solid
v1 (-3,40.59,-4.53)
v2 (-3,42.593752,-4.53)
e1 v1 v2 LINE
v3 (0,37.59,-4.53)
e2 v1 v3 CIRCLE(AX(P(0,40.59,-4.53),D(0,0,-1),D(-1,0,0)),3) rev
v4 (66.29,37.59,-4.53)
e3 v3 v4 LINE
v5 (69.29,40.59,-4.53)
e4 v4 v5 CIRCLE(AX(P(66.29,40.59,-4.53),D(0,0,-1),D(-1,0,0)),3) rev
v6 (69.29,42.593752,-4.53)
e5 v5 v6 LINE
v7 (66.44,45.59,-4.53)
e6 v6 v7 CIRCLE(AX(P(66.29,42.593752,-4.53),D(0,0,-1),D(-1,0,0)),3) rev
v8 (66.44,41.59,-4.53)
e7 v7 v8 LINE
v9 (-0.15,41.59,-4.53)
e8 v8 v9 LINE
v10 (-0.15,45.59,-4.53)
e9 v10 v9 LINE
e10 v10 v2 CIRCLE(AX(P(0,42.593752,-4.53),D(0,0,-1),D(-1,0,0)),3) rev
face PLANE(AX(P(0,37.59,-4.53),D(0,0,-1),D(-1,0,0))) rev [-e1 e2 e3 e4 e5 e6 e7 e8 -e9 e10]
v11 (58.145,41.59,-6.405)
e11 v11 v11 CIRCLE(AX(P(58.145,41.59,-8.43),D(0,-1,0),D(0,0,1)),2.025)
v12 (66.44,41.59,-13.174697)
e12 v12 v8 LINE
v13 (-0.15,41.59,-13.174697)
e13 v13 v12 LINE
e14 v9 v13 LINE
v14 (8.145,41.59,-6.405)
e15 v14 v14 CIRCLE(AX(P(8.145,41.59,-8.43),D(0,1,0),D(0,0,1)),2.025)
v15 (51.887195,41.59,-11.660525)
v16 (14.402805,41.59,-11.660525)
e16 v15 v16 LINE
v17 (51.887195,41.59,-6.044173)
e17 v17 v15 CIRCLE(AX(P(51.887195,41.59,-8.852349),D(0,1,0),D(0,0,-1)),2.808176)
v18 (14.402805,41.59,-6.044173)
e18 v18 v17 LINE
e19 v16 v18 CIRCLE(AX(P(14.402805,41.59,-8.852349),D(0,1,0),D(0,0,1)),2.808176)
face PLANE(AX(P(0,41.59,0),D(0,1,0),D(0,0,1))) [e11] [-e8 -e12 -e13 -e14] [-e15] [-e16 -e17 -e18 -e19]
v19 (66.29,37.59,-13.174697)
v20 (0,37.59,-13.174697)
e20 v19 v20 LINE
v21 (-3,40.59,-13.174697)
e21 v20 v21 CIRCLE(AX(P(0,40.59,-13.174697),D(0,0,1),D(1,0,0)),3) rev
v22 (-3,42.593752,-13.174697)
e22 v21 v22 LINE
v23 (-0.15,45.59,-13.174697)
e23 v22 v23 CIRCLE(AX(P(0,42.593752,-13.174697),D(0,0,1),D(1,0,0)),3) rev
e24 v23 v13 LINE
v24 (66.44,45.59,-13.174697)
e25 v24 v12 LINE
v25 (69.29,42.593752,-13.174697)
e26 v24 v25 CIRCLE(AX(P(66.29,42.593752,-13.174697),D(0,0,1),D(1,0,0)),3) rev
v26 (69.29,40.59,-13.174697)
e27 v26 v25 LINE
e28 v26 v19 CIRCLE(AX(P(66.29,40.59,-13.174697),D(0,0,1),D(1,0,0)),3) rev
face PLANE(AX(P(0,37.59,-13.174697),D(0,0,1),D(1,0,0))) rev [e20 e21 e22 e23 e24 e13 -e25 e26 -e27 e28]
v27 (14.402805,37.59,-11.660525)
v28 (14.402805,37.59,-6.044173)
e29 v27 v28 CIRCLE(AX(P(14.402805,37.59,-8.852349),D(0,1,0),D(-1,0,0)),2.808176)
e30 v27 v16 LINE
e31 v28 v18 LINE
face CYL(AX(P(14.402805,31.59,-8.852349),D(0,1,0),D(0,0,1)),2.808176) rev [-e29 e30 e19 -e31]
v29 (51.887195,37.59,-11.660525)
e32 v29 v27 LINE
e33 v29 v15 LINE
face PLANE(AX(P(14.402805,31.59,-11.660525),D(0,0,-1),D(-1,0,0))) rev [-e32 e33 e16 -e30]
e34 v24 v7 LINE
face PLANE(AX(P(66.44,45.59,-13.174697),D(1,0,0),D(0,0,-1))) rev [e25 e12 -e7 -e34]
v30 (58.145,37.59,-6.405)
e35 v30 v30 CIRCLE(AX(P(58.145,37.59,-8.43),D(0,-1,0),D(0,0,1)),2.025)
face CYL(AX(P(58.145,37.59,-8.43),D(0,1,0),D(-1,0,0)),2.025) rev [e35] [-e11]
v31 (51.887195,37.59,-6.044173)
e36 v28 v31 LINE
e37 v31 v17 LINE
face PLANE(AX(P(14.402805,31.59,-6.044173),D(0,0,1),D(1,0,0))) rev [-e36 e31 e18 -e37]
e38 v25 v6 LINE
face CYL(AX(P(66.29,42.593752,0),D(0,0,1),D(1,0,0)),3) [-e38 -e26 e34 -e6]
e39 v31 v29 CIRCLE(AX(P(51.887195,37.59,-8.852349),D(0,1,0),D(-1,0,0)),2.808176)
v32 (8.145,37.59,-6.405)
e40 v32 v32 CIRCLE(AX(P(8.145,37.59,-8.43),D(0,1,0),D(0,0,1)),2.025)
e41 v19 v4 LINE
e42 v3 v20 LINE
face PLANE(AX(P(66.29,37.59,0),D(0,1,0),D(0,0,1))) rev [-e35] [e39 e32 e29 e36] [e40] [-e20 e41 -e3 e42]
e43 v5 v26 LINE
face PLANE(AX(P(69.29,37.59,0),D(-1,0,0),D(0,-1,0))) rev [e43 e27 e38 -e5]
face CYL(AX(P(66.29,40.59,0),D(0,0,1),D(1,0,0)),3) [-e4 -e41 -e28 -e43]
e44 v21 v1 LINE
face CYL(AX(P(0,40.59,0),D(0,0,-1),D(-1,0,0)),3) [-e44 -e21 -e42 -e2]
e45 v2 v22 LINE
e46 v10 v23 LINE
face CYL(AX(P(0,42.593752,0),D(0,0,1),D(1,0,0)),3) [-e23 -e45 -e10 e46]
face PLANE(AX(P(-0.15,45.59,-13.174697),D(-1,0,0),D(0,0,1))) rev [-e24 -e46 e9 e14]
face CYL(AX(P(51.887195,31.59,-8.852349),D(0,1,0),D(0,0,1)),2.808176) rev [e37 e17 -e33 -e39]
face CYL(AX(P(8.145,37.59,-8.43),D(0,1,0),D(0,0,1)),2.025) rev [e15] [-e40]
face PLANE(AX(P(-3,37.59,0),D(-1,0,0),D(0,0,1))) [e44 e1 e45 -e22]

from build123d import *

# Parameters (mm, degrees)
SKETCH1_W                 = 66.29
SKETCH1_H                 = 100
BOSS_EXTRUDE1_DEPTH       = 41.59
SHELL2_T                  = -3
SHELL2_THICKNESS_2_FACE_W = 60.29
SHELL2_THICKNESS_2_FACE_H = 38.59
SHELL2_THICKNESS_2_DEPTH  = 1
SHELL2_THICKNESS_3_FACE_W = 60.29
SHELL2_THICKNESS_3_FACE_H = 38.59
SHELL2_THICKNESS_3_DEPTH  = 1
CUT_EXTRUDE1_DEPTH        = 125.59
FILLET1_R                 = 2
CUT_EXTRUDE2_REACH        = 128.981
SKETCH5_R                 = 5
SKETCH5_R_2               = 2.32
CUT_EXTRUDE3_START        = -3
SKETCH6_R                 = 23.17
CUT_EXTRUDE3_DEPTH        = 60.29
SKETCH7_R                 = 3.7
CUT_EXTRUDE4_DEPTH        = 1
BOSS_EXTRUDE2_DEPTH       = 10
SKETCH9_R                 = 1.5
CUT_EXTRUDE5_DEPTH        = 13
CUT_EXTRUDE6_START        = -6
SKETCH10_R                = 1.5
CUT_EXTRUDE6_DEPTH        = 6
CHAMFER1_SIZE             = 1
BOSS_EXTRUDE3_DEPTH       = 7
CHAMFER2_SIZE             = 1
SKETCH12_R                = 2.025
BOSS_EXTRUDE4_DEPTH       = 4
CHAMFER1_OF_MIRROR1_SIZE  = 1
CHAMFER2_OF_MIRROR1_SIZE  = 1
CUT_EXTRUDE7_REACH        = 130.572
SKETCH16_W                = 3
SKETCH16_H                = 0.2
CUT_EXTRUDE8_DEPTH        = 4.2
SKETCH17_W                = 9.044697424
SKETCH17_H                = 0.2
CUT_EXTRUDE9_DEPTH        = 66.29
SKETCH18_W                = 2.85
SKETCH18_H                = 8.644697424
BOSS_EXTRUDE5_DEPTH       = 4
FILLET2_R                 = 3
CUT_EXTRUDE10_DEPTH       = 10


with BuildPart() as part:
    # Sketch1 → Boss-Extrude1 (new body)
    with BuildSketch(Plane(origin=(0, 0, 0), x_dir=(1, 0, 0), z_dir=(0, 1, 0))):
        with Locations((33.145, 50)):
            Rectangle(SKETCH1_W, SKETCH1_H)
    extrude(amount=BOSS_EXTRUDE1_DEPTH)

    # Shell2
    shell2_openings = [part.faces().sort_by_distance(p)[0] for p in [
        (33.145, 41.59, -50),
    ]]
    offset(amount=SHELL2_T, openings=shell2_openings, kind=Kind.INTERSECTION)

    # Shell2 thickness 2 face (on inner face of the shell) → Shell2 thickness 2 (cut)
    with BuildSketch(Plane(origin=(33.145, 22.295, -3), x_dir=(1, 0, 0), z_dir=(0, 0, 1))):
        Rectangle(SHELL2_THICKNESS_2_FACE_W, SHELL2_THICKNESS_2_FACE_H)
    extrude(amount=SHELL2_THICKNESS_2_DEPTH, mode=Mode.SUBTRACT)

    # Shell2 thickness 3 face (on inner face of the shell) → Shell2 thickness 3 (cut)
    with BuildSketch(Plane(origin=(33.145, 22.295, -97), x_dir=(-1, 0, 0), z_dir=(0, 0, -1))):
        Rectangle(SHELL2_THICKNESS_3_FACE_W, SHELL2_THICKNESS_3_FACE_H)
    extrude(amount=SHELL2_THICKNESS_3_DEPTH, mode=Mode.SUBTRACT)

    # Sketch3 → Cut-Extrude1 (cut)
    with BuildSketch(Plane.XY):
        Polygon((54.395, 15), (11.895, 15), (11.895, 31.32), (8.815, 31.32), (8.815, 33.97), (7.755, 35.32), (7.145, 35.32), (7.145, 41.59), (59.145, 41.59), (57.145, 35.32), (56.535, 35.32), (55.475, 33.97), (55.475, 31.32), (52.395, 31.32), align=None)
    extrude(amount=-CUT_EXTRUDE1_DEPTH, mode=Mode.SUBTRACT)

    # Fillet1
    fillet1_edges = [part.edges().sort_by_distance(p)[0] for p in [
        (33.145, 0, -100),
        (66.29, 0, -50),
        (33.145, 0, 0),
        (0, 0, -50),
        (0, 20.795, -100),
        (66.29, 20.795, -100),
        (66.29, 20.795, 0),
        (0, 20.795, 0),
    ]]
    fillet(fillet1_edges, radius=FILLET1_R)

    # Cut-Extrude2: up to this face of the body (flat: up to its plane)
    cut_extrude2_end = Plane(part.part.faces().sort_by_distance((66.29, 21.795, -50))[0])
    # Sketch5 → Cut-Extrude2 (cut, up to the picked face)
    with BuildSketch(Plane.ZY, mode=Mode.PRIVATE) as cut_extrude2_sk1:
        with Locations((-72.87, 8)):
            Circle(SKETCH5_R)
    cut_extrude2_tool1 = split(extrude(cut_extrude2_sk1.sketch, amount=-CUT_EXTRUDE2_REACH, mode=Mode.PRIVATE), bisect_by=cut_extrude2_end, keep=Keep.BOTH, mode=Mode.PRIVATE)
    # Sketch5 → Cut-Extrude2 (cut, up to the picked face)
    with BuildSketch(Plane.ZY, mode=Mode.PRIVATE) as cut_extrude2_sk2:
        with Locations((-90.37, 15.93)):
            Circle(SKETCH5_R_2)
    cut_extrude2_tool2 = split(extrude(cut_extrude2_sk2.sketch, amount=-CUT_EXTRUDE2_REACH, mode=Mode.PRIVATE), bisect_by=cut_extrude2_end, keep=Keep.BOTH, mode=Mode.PRIVATE)
    # Sketch5 → Cut-Extrude2 (cut, up to the picked face)
    with BuildSketch(Plane.ZY, mode=Mode.PRIVATE) as cut_extrude2_sk3:
        with Locations((-55.37, 15.93)):
            Circle(SKETCH5_R_2)
    cut_extrude2_tool3 = split(extrude(cut_extrude2_sk3.sketch, amount=-CUT_EXTRUDE2_REACH, mode=Mode.PRIVATE), bisect_by=cut_extrude2_end, keep=Keep.BOTH, mode=Mode.PRIVATE)
    add(cut_extrude2_tool1.solids().sort_by(Axis((0, 8, -72.87), (1, 0, 0)))[0], mode=Mode.SUBTRACT)
    add(cut_extrude2_tool2.solids().sort_by(Axis((0, 15.93, -90.37), (1, 0, 0)))[0], mode=Mode.SUBTRACT)
    add(cut_extrude2_tool3.solids().sort_by(Axis((0, 15.93, -55.37), (1, 0, 0)))[0], mode=Mode.SUBTRACT)

    # Sketch6 → Cut-Extrude3 (cut)
    with BuildSketch(Plane.ZY.offset(CUT_EXTRUDE3_START)):
        with Locations((-72.87, 25.24)):
            Circle(SKETCH6_R)
    extrude(amount=-CUT_EXTRUDE3_DEPTH, mode=Mode.SUBTRACT)

    # Sketch7 → Cut-Extrude4 (cut)
    with BuildSketch(Plane.ZY):
        with Locations((-55.37, 15.93)):
            Circle(SKETCH7_R)
        with Locations((-90.37, 15.93)):
            Circle(SKETCH7_R)
    cut_extrude4 = extrude(amount=-CUT_EXTRUDE4_DEPTH, mode=Mode.SUBTRACT)

    # Sketch8 → Boss-Extrude2 (add)
    with BuildSketch(Plane(origin=(0, 3, 0), x_dir=(1, 0, 0), z_dir=(0, 1, 0))):
        Polygon((3, 18.5), (3, 2), (13, 2), (13, 18.5), (15.79, 18.5), (15.79, 21.25), (8, 21.25), (8, 18.5), align=None)
    boss_extrude2 = extrude(amount=BOSS_EXTRUDE2_DEPTH)

    # Sketch9 → Cut-Extrude5 (cut)
    with BuildSketch(Plane.ZY):
        with Locations((-8.24, 8)):
            Circle(SKETCH9_R)
    cut_extrude5 = extrude(amount=-CUT_EXTRUDE5_DEPTH, mode=Mode.SUBTRACT)

    # Sketch10 → Cut-Extrude6 (cut)
    # profile 1 of 2: a face of its own
    with BuildSketch(Plane(origin=(13, 0, 0), x_dir=(0, 0, -1), z_dir=(1, 0, 0)).offset(CUT_EXTRUDE6_START)):
        Polygon((6.74, 5.401923789), (9.74, 5.401923789), (11.24, 8), (9.74, 10.598076211), (6.74, 10.598076211), (5.24, 8), align=None)
        with Locations(Location((8.24, 8, 0), (0, 0, 180))):
            Circle(SKETCH10_R, mode=Mode.SUBTRACT)
    # profile 2 of 2: a face of its own
    with BuildSketch(Plane(origin=(13, 0, 0), x_dir=(0, 0, -1), z_dir=(1, 0, 0)).offset(CUT_EXTRUDE6_START)):
        with Locations(Location((8.24, 8, 0), (0, 0, 180))):
            Circle(SKETCH10_R)
    cut_extrude6 = extrude(amount=CUT_EXTRUDE6_DEPTH, mode=Mode.SUBTRACT)

    # Chamfer1
    chamfer1_edges = [part.edges().sort_by_distance(p)[0] for p in [
        (3, 8, -18.5),
        (13, 13, -10.25),
        (13, 8, -2),
        (14.395, 13, -18.5),
        (15.79, 13, -19.875),
        (8, 13, -19.875),
        (5.5, 13, -18.5),
        (3, 13, -10.25),
        (8, 13, -2),
        (11.895, 13, -21.25),
    ]]
    chamfer(chamfer1_edges, length=CHAMFER1_SIZE)

    # Sketch11 → Boss-Extrude3 (add)
    with BuildSketch(Plane(origin=(0, 3, 0), x_dir=(1, 0, 0), z_dir=(0, 1, 0))):
        Polygon((8, 52.25), (20.582035751, 52.25), (20.582035751, 55.357324548), (3, 55.357324548), (3, 52.25), align=None)
    boss_extrude3 = extrude(amount=BOSS_EXTRUDE3_DEPTH)

    # Chamfer2
    chamfer2_edges = [part.edges().sort_by_distance(p)[0] for p in [
        (20.582035751, 10, -53.803662274),
        (11.791017876, 10, -55.357324548),
        (11.791017876, 10, -52.25),
    ]]
    chamfer(chamfer2_edges, length=CHAMFER2_SIZE)

    # Sketch12 → Boss-Extrude4 (add)
    # profile 1 of 2: a face of its own
    with BuildSketch(Plane(origin=(0, 41.59, 0), x_dir=(1, 0, 0), z_dir=(0, 1, 0))):
        Polygon((8.145, 13.174697424), (33.145, 13.174697424), (33.145, 4.53), (8.145, 4.53), (-3, 4.53), (-3, 13.174697424), align=None)
        with Locations(Location((8.145, 8.43, 0), (0, 0, 270))):
            Circle(SKETCH12_R, mode=Mode.SUBTRACT)
    # profile 2 of 2: a face of its own
    with BuildSketch(Plane(origin=(0, 41.59, 0), x_dir=(1, 0, 0), z_dir=(0, 1, 0))):
        Polygon((8.145, 58.685302576), (-3, 58.685302576), (-3, 67.33), (8.145, 67.33), (33.145, 67.33), (33.145, 58.685302576), align=None)
        with Locations(Location((8.145, 63.43, 0), (0, 0, 270))):
            Circle(SKETCH12_R, mode=Mode.SUBTRACT)
    boss_extrude4 = extrude(amount=-BOSS_EXTRUDE4_DEPTH)

    # Mirror1: Cut-Extrude4, Boss-Extrude2, Cut-Extrude5, Cut-Extrude6, Boss-Extrude3, Boss-Extrude4 across plane
    add(cut_extrude4.mirror(Plane.ZY.offset(-33.145)), mode=Mode.SUBTRACT)
    add(boss_extrude2.mirror(Plane.ZY.offset(-33.145)))
    add(cut_extrude5.mirror(Plane.ZY.offset(-33.145)), mode=Mode.SUBTRACT)
    add(cut_extrude6.mirror(Plane.ZY.offset(-33.145)), mode=Mode.SUBTRACT)
    add(boss_extrude3.mirror(Plane.ZY.offset(-33.145)))
    add(boss_extrude4.mirror(Plane.ZY.offset(-33.145)))

    # Chamfer1 of Mirror1
    chamfer1_of_mirror1_edges = [part.edges().sort_by_distance(p)[0] for p in [
        (63.29, 8, -18.5),
        (53.29, 13, -10.25),
        (53.29, 8, -2),
        (51.895, 13, -18.5),
        (50.5, 13, -19.875),
        (58.29, 13, -19.875),
        (60.79, 13, -18.5),
        (63.29, 13, -10.25),
        (58.29, 13, -2),
        (54.395, 13, -21.25),
    ]]
    chamfer(chamfer1_of_mirror1_edges, length=CHAMFER1_OF_MIRROR1_SIZE)

    # Chamfer2 of Mirror1
    chamfer2_of_mirror1_edges = [part.edges().sort_by_distance(p)[0] for p in [
        (45.707964249, 10, -53.803662274),
        (54.498982124, 10, -55.357324548),
        (54.498982124, 10, -52.25),
    ]]
    chamfer(chamfer2_of_mirror1_edges, length=CHAMFER2_OF_MIRROR1_SIZE)

    # Cut-Extrude7: up to this face of the body (flat: up to its plane)
    cut_extrude7_end = Plane(part.part.faces().sort_by_distance((0, 21.922757181, -49.29907897))[0])
    # Sketch13 → Cut-Extrude7 (cut, up to the picked face)
    with BuildSketch(Plane(origin=(66.29, 0, 0), x_dir=(0, 0, -1), z_dir=(1, 0, 0)), mode=Mode.PRIVATE) as cut_extrude7_sk1:
        Polygon((15.839041752, 41.371414907), (26.360630861, 23.584658178), (47.025208595, 23.803243271), (57.168197218, 41.808585093), (46.646608109, 59.595341822), (25.982030375, 59.376756729), align=None)
    cut_extrude7_tool1 = split(extrude(cut_extrude7_sk1.sketch, amount=-CUT_EXTRUDE7_REACH, mode=Mode.PRIVATE), bisect_by=cut_extrude7_end, keep=Keep.BOTH, mode=Mode.PRIVATE)
    # Sketch13 → Cut-Extrude7 (cut, up to the picked face)
    with BuildSketch(Plane(origin=(66.29, 0, 0), x_dir=(0, 0, -1), z_dir=(1, 0, 0)), mode=Mode.PRIVATE) as cut_extrude7_sk2:
        Polygon((73.241690704, 41.59), (78.598611092, 32.311541717), (89.312451867, 32.311541717), (94.669372255, 41.59), (89.312451867, 50.868458283), (78.598611092, 50.868458283), align=None)
    cut_extrude7_tool2 = split(extrude(cut_extrude7_sk2.sketch, amount=-CUT_EXTRUDE7_REACH, mode=Mode.PRIVATE), bisect_by=cut_extrude7_end, keep=Keep.BOTH, mode=Mode.PRIVATE)
    add(cut_extrude7_tool1.solids().sort_by(Axis((66.29, 41.59, -36.503619), (-1, 0, 0)))[0], mode=Mode.SUBTRACT)
    add(cut_extrude7_tool2.solids().sort_by(Axis((66.29, 41.59, -83.955531), (-1, 0, 0)))[0], mode=Mode.SUBTRACT)

    # Sketch16 → Cut-Extrude8 (cut)
    with BuildSketch(Plane(origin=(0, 41.59, 0), x_dir=(1, 0, 0), z_dir=(0, 1, 0))):
        with Locations((1.5, 67.43)):
            Rectangle(SKETCH16_W, SKETCH16_H)
        with Locations((1.5, 58.585302576)):
            Rectangle(SKETCH16_W, SKETCH16_H)
        with Locations((1.5, 4.43)):
            Rectangle(SKETCH16_W, SKETCH16_H)
        with Locations((1.5, 13.274697424)):
            Rectangle(SKETCH16_W, SKETCH16_H)
        with Locations((64.79, 13.274697424)):
            Rectangle(SKETCH16_W, SKETCH16_H)
        with Locations((64.79, 4.43)):
            Rectangle(SKETCH16_W, SKETCH16_H)
        with Locations((64.79, 58.585302576)):
            Rectangle(SKETCH16_W, SKETCH16_H)
        with Locations((64.79, 67.43)):
            Rectangle(SKETCH16_W, SKETCH16_H)
    extrude(amount=-CUT_EXTRUDE8_DEPTH, mode=Mode.SUBTRACT)

    # Sketch17 → Cut-Extrude9 (cut)
    with BuildSketch(Plane.ZY):
        with Locations((-63.007651288, 37.49)):
            Rectangle(SKETCH17_W, SKETCH17_H)
        with Locations((-8.852348712, 37.49)):
            Rectangle(SKETCH17_W, SKETCH17_H)
    extrude(amount=-CUT_EXTRUDE9_DEPTH, mode=Mode.SUBTRACT)


with BuildPart() as cut_extrude9_piece_1:
    # of the separate pieces the step leaves, piece 1, a body of its own (cut_extrude9_pieces)
    add(part.part.solids().sort_by_distance((63.29, 9, -52.25))[0])


with BuildPart() as cut_extrude9_piece_2:
    # of the separate pieces the step leaves, piece 2, a body of its own (cut_extrude9_pieces)
    add(part.part.solids().sort_by_distance((69.29, 37.59, -58.685302576))[0])


with BuildPart() as cut_extrude9_piece_3:
    # of the separate pieces the step leaves, piece 3, a body of its own (cut_extrude9_pieces)
    add(part.part.solids().sort_by_distance((69.29, 37.59, -4.53))[0])

    # Sketch18 → Boss-Extrude5 (add)
    with BuildSketch(Plane(origin=(0, 41.59, 0), x_dir=(1, 0, 0), z_dir=(0, 1, 0))):
        with Locations((-1.575, 8.852348712)):
            Rectangle(SKETCH18_W, SKETCH18_H)
        with Locations((67.865, 8.852348712)):
            Rectangle(SKETCH18_W, SKETCH18_H)
    extrude(amount=BOSS_EXTRUDE5_DEPTH)

    # Fillet2
    # the kernel refuses this fillet: 3 mm, written as the material it takes off along each edge
    with BuildSketch(Plane(origin=(-3, 37.59, 2.97), x_dir=(1, 0, 0), z_dir=(0, 0, -1))) as fillet2_piece_1:
        with BuildLine():
            CenterArc((FILLET2_R, -FILLET2_R), FILLET2_R, 90, 90)
            Line((0, -FILLET2_R), (-FILLET2_R * 0.02, -FILLET2_R))
            Line((-FILLET2_R * 0.02, -FILLET2_R), (-FILLET2_R * 0.02, FILLET2_R * 0.02))
            Line((-FILLET2_R * 0.02, FILLET2_R * 0.02), (FILLET2_R, FILLET2_R * 0.02))
            Line((FILLET2_R, FILLET2_R * 0.02), (FILLET2_R, 0))
        make_face()
    extrude(amount=23.644697424, mode=Mode.SUBTRACT)
    with BuildSketch(Plane(origin=(69.29, 37.59, 2.97), x_dir=(-1, 0, 0), z_dir=(0, 0, -1))) as fillet2_piece_2:
        with BuildLine():
            CenterArc((FILLET2_R, FILLET2_R), FILLET2_R, 180, 90)
            Line((0, FILLET2_R), (-FILLET2_R * 0.02, FILLET2_R))
            Line((-FILLET2_R * 0.02, FILLET2_R), (-FILLET2_R * 0.02, -FILLET2_R * 0.02))
            Line((-FILLET2_R * 0.02, -FILLET2_R * 0.02), (FILLET2_R, -FILLET2_R * 0.02))
            Line((FILLET2_R, -FILLET2_R * 0.02), (FILLET2_R, 0))
        make_face()
    extrude(amount=23.644697424, mode=Mode.SUBTRACT)
    with BuildSketch(Plane(origin=(-3, 45.59, 2.960619133), x_dir=(1, 0, 0), z_dir=(0, 0, -1))) as fillet2_piece_3:
        with BuildLine():
            CenterArc((3, 2.996247653), FILLET2_R, 180, 87.134016017)
            Line((0, 2.996247653), (-0.06, 2.996247653))
            Line((-0.06, 2.996247653), (-0.06, 0))
            Line((-0.06, 0), (0, -0.06))
            ThreePointArc((0, -0.06), (1.425, -0.06), (2.847, -0.059924953))
            Line((2.847, -0.059924953), (2.85, 0))
        make_face()
    extrude(amount=23.62593569, mode=Mode.SUBTRACT)
    with BuildSketch(Plane(origin=(69.29, 45.59, 2.960619133), x_dir=(-1, 0, 0), z_dir=(0, 0, -1))) as fillet2_piece_4:
        with BuildLine():
            CenterArc((3, -2.996247653), FILLET2_R, 92.865983983, 87.134016017)
            Line((0, -2.996247653), (-0.06, -2.996247653))
            Line((-0.06, -2.996247653), (-0.06, 0))
            Line((-0.06, 0), (0, 0.06))
            ThreePointArc((0, 0.06), (1.425, 0.06), (2.847, 0.059924953))
            Line((2.847, 0.059924953), (2.85, 0))
        make_face()
    extrude(amount=23.62593569, mode=Mode.SUBTRACT)

    # Sketch19 → Cut-Extrude10 (cut)
    with BuildSketch(Plane(origin=(0, 41.59, 0), x_dir=(1, 0, 0), z_dir=(0, 1, 0))):
        with BuildLine():
            Line((14.402805243, 11.660524623), (51.887194757, 11.660524623))
            ThreePointArc((51.887194757, 11.660524623), (54.695370668, 8.852348712), (51.887194757, 6.044172801))
            Line((51.887194757, 6.044172801), (14.402805243, 6.044172801))
            ThreePointArc((14.402805243, 6.044172801), (11.594629332, 8.852348712), (14.402805243, 11.660524623))
        make_face()
    extrude(amount=-CUT_EXTRUDE10_DEPTH, mode=Mode.SUBTRACT)


solid = cut_extrude9_piece_3.part
